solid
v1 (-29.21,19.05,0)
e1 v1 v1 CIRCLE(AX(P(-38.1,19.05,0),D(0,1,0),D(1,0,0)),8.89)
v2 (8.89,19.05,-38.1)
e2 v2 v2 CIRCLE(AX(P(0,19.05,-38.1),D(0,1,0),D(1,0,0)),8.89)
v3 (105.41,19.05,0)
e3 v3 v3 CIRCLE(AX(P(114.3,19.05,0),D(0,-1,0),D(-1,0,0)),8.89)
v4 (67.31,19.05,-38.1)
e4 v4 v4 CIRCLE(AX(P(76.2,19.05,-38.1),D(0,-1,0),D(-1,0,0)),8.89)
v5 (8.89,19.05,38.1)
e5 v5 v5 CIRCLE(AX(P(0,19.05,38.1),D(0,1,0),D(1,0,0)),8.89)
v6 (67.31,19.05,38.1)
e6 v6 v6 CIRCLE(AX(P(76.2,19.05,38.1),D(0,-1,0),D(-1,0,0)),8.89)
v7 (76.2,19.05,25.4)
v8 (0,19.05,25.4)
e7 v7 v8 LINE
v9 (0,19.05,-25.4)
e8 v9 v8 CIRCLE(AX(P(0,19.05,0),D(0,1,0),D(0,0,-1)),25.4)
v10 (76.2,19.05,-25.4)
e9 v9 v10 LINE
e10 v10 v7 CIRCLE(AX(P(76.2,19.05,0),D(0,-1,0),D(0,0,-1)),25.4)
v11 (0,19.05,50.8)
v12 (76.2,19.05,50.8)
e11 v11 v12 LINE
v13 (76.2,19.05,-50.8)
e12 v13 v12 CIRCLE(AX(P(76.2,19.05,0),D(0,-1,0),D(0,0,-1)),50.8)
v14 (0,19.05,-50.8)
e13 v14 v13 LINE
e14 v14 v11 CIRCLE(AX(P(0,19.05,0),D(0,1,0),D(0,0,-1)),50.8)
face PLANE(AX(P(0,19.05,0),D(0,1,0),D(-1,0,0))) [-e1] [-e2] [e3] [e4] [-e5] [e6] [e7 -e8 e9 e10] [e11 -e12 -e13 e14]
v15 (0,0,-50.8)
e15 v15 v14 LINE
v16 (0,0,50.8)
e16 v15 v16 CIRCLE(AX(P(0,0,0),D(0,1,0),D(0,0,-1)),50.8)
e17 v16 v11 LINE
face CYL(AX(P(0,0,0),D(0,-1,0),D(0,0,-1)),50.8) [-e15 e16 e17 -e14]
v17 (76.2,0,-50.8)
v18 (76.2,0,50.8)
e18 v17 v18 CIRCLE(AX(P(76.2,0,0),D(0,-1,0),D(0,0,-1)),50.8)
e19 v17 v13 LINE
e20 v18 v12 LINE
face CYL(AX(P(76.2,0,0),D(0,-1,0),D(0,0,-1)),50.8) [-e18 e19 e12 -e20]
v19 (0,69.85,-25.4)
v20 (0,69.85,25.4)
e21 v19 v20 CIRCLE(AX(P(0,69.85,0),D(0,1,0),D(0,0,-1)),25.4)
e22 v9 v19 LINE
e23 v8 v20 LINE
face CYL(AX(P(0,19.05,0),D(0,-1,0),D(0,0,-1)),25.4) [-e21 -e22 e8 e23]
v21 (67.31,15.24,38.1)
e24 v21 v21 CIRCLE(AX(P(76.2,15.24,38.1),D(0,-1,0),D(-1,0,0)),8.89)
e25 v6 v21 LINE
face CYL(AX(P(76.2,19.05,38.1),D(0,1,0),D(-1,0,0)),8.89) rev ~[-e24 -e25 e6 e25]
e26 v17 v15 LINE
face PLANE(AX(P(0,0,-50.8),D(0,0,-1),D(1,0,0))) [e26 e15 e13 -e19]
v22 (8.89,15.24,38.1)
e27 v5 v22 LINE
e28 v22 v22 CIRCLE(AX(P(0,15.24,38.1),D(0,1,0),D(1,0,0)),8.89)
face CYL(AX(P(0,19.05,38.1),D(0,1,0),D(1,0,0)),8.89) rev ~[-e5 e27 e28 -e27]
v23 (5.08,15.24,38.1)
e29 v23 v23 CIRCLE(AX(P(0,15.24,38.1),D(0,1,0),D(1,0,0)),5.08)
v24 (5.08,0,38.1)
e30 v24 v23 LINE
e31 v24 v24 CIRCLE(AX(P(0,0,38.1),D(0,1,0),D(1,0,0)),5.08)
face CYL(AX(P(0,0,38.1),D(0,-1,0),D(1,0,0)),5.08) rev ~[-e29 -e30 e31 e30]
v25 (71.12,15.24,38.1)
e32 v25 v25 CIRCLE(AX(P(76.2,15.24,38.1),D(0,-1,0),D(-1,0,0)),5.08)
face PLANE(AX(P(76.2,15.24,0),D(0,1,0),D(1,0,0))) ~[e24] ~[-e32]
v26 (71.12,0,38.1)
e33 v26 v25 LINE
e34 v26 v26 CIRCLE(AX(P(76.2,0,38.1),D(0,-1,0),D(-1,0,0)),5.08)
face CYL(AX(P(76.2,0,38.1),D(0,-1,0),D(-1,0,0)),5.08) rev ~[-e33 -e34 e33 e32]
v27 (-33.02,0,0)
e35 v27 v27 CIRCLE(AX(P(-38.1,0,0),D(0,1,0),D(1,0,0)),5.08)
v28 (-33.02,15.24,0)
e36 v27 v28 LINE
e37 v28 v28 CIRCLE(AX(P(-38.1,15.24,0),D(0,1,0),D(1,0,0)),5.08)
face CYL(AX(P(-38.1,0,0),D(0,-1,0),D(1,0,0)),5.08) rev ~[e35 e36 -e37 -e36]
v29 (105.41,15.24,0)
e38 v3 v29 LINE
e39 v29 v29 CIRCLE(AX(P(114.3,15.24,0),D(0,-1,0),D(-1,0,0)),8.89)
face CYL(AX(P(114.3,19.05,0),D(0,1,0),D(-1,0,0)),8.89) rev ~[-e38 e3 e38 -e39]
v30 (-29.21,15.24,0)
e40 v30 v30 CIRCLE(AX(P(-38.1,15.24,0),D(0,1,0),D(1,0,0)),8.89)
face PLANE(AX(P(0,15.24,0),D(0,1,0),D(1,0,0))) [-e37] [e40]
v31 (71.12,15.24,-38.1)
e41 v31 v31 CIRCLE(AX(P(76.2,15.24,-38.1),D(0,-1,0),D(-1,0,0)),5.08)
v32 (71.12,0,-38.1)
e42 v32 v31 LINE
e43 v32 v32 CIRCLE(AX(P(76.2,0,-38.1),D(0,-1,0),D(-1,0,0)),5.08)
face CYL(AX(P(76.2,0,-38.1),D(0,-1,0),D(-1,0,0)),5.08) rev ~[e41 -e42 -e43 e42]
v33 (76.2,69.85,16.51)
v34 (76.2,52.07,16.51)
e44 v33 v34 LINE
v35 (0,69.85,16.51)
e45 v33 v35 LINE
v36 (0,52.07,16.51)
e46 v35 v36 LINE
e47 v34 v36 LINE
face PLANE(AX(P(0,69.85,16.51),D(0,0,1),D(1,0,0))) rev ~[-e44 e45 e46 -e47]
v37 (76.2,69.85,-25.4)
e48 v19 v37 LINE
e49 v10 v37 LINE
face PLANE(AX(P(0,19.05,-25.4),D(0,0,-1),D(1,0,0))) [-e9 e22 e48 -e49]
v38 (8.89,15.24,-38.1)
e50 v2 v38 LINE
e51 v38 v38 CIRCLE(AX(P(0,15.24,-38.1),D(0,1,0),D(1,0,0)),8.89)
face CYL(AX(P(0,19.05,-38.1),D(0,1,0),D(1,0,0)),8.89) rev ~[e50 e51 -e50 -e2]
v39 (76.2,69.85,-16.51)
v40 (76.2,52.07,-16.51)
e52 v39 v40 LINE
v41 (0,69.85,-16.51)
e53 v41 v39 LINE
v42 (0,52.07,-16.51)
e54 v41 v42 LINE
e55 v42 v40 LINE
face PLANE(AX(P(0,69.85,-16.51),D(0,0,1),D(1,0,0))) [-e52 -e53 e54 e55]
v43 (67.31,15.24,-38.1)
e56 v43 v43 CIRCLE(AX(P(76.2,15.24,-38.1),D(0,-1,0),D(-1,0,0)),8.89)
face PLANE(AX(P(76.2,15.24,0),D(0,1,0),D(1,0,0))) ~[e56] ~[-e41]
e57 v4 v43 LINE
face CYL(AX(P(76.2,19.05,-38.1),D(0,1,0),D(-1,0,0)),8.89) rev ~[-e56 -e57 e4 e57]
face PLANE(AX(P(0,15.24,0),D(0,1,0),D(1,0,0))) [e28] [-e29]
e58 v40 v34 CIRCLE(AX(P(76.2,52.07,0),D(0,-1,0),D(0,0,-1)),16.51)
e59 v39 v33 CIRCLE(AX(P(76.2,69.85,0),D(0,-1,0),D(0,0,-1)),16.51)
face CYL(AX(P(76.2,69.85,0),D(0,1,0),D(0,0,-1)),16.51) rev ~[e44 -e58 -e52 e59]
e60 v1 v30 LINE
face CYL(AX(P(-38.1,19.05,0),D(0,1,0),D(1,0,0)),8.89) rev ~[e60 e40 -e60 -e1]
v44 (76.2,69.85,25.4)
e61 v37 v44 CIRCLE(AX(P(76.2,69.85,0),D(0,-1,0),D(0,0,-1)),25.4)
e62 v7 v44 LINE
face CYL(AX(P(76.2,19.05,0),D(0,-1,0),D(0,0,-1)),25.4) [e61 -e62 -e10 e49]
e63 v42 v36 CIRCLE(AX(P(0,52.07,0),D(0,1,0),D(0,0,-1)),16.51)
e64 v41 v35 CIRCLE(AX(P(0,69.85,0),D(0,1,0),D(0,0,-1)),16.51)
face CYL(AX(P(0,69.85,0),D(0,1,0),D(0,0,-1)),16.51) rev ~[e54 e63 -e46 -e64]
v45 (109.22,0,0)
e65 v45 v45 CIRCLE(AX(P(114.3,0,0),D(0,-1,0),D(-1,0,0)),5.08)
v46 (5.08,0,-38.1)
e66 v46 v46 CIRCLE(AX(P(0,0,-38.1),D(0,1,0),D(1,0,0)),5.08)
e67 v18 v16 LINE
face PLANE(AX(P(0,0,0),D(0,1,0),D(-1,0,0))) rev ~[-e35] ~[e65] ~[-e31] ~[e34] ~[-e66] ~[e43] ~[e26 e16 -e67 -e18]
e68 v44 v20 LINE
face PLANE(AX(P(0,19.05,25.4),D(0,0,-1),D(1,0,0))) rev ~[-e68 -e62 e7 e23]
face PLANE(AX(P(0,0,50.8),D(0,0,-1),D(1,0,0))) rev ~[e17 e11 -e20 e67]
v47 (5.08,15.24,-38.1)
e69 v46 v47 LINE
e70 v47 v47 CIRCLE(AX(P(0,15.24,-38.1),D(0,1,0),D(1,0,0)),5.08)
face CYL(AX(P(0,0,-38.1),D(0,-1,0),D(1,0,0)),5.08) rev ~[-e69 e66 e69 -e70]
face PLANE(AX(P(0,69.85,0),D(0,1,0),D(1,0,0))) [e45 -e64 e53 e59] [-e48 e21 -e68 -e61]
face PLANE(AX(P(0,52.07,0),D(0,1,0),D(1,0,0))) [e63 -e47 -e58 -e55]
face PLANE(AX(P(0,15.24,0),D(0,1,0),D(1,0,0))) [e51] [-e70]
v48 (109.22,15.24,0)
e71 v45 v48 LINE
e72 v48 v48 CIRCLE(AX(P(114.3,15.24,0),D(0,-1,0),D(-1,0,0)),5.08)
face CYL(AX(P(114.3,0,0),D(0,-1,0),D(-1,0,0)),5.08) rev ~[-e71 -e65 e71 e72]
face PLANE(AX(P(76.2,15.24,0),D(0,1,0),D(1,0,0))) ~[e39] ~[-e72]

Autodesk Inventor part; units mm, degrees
ref_plane "YZ Plane" through (0, 0, 0) normal (1, 0, 0) x (0, 1, 0)
ref_plane "XZ Plane" through (0, 0, 0) normal (0, 1, 0) x (-1, 0, 0)
ref_plane "XY Plane" through (0, 0, 0) normal (0, 0, 1) x (1, 0, 0)
sketch "Sketch5" plane through (0, 0, 0) normal (0, 1, 0) x (-1, 0, 0)
  arc A0 (0, -50.8) -> (0, 50.8) centre (0, 0) ccw
  line L0 (0, -50.8) -> (-38.1, -50.8)
  line L1 (0, 50.8) -> (-38.1, 50.8)
  line L2 (-38.1, 50.8) -> (-38.1, -50.8)
  dimension "d13" = 101.6
  dimension "d14" = 38.1
  dimension "d15" = 38.1
extrude "Extrusion2" add sketch "Sketch5" along normal blind 19.05
sketch "Sketch6" plane through (0, 19.05, 0) normal (0, 1, 0) x (1, 0, 0)
  arc A0 (0, 25.4) -> (0, -25.4) centre (0, 0) ccw
  line L0 (0, 25.4) -> (38.1, 25.4)
  line L1 (38.1, -50.8) -> (38.1, 50.8) projected
  line L2 (0, -25.4) -> (38.1, -25.4)
  line L3 (38.1, 25.4) -> (38.1, -25.4)
  dimension "d18" = 50.8
extrude "Extrusion3" add sketch "Sketch6" along normal blind 50.8
sketch "Sketch7" plane through (0, 69.85, 0) normal (0, 1, 0) x (1, 0, 0)
  arc A0 (0, 16.51) -> (0, -16.51) centre (0, 0) ccw
  line L0 (0, 16.51) -> (38.1, 16.51)
  line L1 (38.1, -25.4) -> (38.1, 25.4) projected
  line L2 (0, -16.51) -> (38.1, -16.51)
  dimension "d21" = 33.02
extrude "Extrusion4" cut sketch "Sketch7" against normal blind 17.78
sketch "Sketch9" plane through (0, 0, 0) normal (0, -1, 0) x (1, 0, 0)
  arc A0 (0, 38.1) -> (0, -38.1) centre (0, 0) ccw
  circle A1 centre (-38.1, 0) radius 5.08
  circle A2 centre (0, 38.1) radius 5.08
  circle A3 centre (0, -38.1) radius 5.08
  dimension "d24" = 76.2
  dimension "d25" = 10.16
  dimension "d27" = 10.16
  dimension "d28" = 10.16
extrude "Extrusion5" cut sketch "Sketch9" against normal blind 19.05
sketch "Sketch10" plane through (0, 19.05, 0) normal (0, 1, 0) x (1, 0, 0)
  circle A0 centre (0, -38.1) radius 5.08 projected
  circle A1 centre (0, -38.1) radius 8.89
  circle A2 centre (-38.1, 0) radius 5.08 projected
  circle A3 centre (0, 38.1) radius 5.08 projected
  circle A4 centre (-38.1, 0) radius 8.89
  circle A5 centre (0, 38.1) radius 8.89
  point P0 (0, 0)
  dimension "d31" = 17.78
  dimension "d35" = 17.78
extrude "Extrusion6" cut sketch "Sketch10" against normal blind 3.81
mirror "Mirror1" about plane through (38.1, 0, 50.8) normal (1, 0, 0)
properties part number "Problem14_36_JacobMorgan_030916_pd3" material "Steel, Mild"
